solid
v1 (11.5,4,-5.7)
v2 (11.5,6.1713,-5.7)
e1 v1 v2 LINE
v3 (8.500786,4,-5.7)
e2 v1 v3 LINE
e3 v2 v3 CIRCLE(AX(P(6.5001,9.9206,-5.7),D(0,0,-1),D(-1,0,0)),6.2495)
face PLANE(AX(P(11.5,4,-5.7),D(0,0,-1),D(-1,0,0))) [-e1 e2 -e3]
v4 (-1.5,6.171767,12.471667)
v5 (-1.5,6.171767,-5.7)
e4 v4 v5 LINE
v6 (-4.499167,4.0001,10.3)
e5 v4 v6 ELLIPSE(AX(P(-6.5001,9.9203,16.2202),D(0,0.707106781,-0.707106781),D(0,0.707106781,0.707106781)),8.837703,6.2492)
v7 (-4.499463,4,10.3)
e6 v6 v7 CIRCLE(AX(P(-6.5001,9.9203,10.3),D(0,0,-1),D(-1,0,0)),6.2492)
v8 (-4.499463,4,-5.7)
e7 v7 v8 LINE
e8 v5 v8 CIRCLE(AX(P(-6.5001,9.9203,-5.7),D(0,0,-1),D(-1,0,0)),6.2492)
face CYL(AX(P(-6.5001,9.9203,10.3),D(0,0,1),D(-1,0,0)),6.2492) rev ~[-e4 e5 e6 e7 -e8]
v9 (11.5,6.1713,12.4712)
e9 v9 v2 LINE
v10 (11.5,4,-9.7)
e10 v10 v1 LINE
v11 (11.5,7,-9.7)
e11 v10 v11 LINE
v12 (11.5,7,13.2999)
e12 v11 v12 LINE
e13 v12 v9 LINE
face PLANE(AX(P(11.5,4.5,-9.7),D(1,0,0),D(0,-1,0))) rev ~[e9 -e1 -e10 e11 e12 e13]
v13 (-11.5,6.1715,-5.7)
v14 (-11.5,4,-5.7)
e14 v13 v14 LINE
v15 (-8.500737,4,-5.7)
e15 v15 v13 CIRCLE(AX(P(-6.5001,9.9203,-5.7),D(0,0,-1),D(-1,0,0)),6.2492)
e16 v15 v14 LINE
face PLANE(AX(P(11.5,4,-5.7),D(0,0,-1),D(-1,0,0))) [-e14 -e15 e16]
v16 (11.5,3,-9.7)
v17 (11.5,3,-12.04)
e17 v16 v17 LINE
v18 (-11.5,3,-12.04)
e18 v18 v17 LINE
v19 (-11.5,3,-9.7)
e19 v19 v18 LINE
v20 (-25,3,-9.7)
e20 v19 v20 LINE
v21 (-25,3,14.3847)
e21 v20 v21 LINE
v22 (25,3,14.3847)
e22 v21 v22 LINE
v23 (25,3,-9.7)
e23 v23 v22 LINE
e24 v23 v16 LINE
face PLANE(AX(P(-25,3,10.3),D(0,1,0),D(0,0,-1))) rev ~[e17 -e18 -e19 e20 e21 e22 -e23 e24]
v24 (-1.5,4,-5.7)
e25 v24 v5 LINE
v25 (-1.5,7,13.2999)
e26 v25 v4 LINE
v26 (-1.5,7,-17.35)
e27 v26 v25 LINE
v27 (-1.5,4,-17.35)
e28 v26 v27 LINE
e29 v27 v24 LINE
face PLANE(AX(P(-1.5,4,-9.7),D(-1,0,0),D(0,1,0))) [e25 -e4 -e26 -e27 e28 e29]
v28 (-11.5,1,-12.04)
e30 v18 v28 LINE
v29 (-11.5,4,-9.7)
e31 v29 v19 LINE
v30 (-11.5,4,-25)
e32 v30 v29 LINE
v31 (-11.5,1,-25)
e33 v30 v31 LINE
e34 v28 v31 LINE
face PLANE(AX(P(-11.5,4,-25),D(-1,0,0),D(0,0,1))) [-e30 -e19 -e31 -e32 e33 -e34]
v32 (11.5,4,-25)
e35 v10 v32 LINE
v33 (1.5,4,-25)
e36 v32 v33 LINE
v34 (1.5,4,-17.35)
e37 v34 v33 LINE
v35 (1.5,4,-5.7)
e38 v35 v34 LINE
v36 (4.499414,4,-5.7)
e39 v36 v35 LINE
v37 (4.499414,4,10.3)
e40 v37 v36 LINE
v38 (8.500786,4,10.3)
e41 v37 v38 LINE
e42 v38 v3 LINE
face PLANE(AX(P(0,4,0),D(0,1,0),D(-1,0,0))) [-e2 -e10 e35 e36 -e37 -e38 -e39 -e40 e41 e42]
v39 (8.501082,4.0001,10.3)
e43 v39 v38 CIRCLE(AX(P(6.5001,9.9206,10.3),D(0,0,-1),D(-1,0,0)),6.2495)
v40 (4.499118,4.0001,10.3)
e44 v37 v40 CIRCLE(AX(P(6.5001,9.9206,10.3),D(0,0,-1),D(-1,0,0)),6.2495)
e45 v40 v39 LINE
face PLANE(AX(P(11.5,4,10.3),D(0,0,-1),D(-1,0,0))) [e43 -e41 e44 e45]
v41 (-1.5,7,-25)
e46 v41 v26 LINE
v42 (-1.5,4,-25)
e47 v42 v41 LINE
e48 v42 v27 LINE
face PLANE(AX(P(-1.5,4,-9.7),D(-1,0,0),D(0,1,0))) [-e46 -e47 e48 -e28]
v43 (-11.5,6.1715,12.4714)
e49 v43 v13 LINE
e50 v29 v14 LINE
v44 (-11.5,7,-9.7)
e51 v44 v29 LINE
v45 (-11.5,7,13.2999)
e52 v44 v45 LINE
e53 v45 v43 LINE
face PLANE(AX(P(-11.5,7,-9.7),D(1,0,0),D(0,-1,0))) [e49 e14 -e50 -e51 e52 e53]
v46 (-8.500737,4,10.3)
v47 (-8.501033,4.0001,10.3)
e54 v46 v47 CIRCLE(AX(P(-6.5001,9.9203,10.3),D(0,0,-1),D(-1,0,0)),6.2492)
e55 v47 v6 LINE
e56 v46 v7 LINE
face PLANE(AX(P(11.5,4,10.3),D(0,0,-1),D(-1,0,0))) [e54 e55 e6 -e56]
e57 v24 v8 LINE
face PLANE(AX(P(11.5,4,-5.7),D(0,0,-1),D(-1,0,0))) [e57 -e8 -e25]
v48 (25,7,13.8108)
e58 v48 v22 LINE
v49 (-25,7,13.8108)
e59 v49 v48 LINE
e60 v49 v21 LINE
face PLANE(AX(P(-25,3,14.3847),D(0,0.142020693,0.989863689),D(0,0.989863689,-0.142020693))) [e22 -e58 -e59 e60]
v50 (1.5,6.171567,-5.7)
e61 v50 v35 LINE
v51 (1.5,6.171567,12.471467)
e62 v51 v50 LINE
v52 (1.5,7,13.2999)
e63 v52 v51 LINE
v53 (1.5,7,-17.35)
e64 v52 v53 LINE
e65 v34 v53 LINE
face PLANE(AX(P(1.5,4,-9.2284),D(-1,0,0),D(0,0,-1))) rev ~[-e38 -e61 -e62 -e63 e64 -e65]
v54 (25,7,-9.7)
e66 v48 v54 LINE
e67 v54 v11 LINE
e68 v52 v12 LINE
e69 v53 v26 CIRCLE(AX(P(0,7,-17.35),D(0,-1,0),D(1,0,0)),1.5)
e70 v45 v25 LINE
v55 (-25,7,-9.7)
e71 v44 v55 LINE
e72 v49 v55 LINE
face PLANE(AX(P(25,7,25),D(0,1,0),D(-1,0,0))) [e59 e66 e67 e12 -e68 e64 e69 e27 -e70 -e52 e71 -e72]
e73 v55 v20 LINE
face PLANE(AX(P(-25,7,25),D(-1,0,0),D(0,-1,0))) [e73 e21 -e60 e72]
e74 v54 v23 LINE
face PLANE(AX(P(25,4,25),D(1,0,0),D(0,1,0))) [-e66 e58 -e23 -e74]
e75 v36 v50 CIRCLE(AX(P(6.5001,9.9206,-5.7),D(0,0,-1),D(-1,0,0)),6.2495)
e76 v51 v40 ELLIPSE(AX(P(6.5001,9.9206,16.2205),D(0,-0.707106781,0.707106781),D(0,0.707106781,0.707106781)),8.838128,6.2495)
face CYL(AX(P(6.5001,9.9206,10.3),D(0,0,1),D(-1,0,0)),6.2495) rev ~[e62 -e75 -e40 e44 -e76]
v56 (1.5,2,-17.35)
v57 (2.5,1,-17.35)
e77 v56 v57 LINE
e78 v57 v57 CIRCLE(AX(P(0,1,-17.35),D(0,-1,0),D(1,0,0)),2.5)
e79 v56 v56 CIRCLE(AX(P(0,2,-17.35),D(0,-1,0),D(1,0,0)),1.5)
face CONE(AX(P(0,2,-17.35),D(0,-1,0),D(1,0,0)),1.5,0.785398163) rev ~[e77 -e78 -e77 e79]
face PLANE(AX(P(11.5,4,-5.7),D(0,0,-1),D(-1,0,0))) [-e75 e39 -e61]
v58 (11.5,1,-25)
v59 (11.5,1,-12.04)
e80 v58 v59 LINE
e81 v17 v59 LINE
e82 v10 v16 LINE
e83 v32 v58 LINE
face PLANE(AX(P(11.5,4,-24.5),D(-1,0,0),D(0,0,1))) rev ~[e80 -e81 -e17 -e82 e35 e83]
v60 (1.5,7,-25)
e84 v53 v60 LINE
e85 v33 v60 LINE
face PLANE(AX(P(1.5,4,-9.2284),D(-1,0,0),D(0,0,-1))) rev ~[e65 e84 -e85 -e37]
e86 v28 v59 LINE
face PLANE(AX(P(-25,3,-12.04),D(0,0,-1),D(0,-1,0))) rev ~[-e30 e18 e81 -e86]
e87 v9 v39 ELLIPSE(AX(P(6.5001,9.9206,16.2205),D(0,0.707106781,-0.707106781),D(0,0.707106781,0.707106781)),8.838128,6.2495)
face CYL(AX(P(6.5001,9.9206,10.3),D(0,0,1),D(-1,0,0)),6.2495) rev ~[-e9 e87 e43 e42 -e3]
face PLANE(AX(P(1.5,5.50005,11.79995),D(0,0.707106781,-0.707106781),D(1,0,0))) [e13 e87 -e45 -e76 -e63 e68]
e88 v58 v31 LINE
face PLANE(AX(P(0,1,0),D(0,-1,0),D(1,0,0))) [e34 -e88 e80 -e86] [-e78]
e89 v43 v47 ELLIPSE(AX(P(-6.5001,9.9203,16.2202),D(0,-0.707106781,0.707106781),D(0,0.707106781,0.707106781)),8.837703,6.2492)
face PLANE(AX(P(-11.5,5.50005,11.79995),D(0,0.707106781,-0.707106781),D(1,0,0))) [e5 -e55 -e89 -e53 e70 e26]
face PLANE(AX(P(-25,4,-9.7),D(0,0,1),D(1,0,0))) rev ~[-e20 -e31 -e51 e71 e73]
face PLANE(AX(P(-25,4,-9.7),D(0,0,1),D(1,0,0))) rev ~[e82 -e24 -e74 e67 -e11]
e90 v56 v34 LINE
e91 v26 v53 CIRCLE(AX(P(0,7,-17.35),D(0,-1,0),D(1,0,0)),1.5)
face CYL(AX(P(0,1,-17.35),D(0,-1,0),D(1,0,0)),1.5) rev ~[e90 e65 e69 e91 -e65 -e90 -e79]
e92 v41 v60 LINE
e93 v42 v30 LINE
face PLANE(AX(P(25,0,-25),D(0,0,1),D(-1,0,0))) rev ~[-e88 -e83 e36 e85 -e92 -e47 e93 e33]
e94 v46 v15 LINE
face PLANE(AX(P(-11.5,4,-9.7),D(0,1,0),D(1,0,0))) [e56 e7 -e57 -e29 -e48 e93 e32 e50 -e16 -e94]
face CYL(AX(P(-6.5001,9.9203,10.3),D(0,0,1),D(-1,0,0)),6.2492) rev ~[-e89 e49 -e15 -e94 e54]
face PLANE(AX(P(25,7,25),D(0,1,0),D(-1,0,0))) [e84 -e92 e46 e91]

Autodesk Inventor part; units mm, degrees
ref_plane "YZ Plane" through (0, 0, 0) normal (1, 0, 0) x (0, 1, 0)
ref_plane "XZ Plane" through (0, 0, 0) normal (0, 1, 0) x (-1, 0, 0)
ref_plane "XY Plane" through (0, 0, 0) normal (0, 0, 1) x (1, 0, 0)
sketch "Sketch1" plane through (0, 0, 0) normal (0, 1, 0) x (-1, 0, 0)
  line L0 (-25, -25) -> (25, -25)
  line L1 (25, -25) -> (25, 25)
  line L2 (25, 25) -> (-25, 25)
  line L3 (-25, 25) -> (-25, -25)
  point P0 (0, 0)
  dimension "d2" = 50
  dimension "d3" = 50
extrude "Extrusion1" add sketch "Sketch1" along normal blind 4
sketch "Sketch2" plane through (0, 4, 0) normal (0, 1, 0) x (1, 0, 0)
  line L0 (-25, 25) -> (-25, -25) projected
  line L1 (-25, -25) -> (25, -25) projected
  line L2 (25, -25) -> (25, 25) projected
  line L3 (25, 25) -> (-25, 25) projected
  line L4 (-25, -25) -> (25, -25) projected
  line L5 (0, -25) -> (0, 25)
  line L6 (25, 25) -> (-25, 25) projected
  line L7 (0, -25) -> (-1.5, -25)
  line L8 (-1.5, -25) -> (1.5, -25)
  line L9 (1.5, -25) -> (1.5, 25)
  line L10 (1.5, 25) -> (-1.5, 25)
  line L11 (-1.5, 25) -> (-1.5, -25)
  line L12 (1.5, 9.2284) -> (-1.5, 9.2284)
  line L13 (1.5, 9.2284) -> (-1.5, 9.2284)
  line L14 (-1.5, 9.2284) -> (-1.5, 25)
  line L15 (-1.5, 25) -> (1.5, 25)
  line L16 (1.5, 25) -> (1.5, 9.2284)
  point P0 (0, 0)
  point P1 (1.5, 25)
  dimension "d6" = 1.5
  dimension "d7" = 3
extrude "Extrusion2" add sketch "Sketch2" along normal blind 3 contours L3 L5 L12 L11 | L3 L9 L12 L5
sketch "Sketch3" plane through (0, 4, 0) normal (0, 1, 0) x (1, 0, 0)
  line L0 (1.5, 25) -> (1.5, 9.2284) projected
  line L1 (1.5, 9.2284) -> (-1.5, 9.2284) projected
  line L2 (-1.5, 9.2284) -> (-1.5, 25) projected
  line L3 (-1.5, 25) -> (-25, 25) projected
  line L4 (-25, 25) -> (-25, -25) projected
  line L5 (-25, -25) -> (25, -25) projected
  line L6 (25, -25) -> (25, 25) projected
  line L7 (25, 25) -> (1.5, 25) projected
  line L8 (11.5, 24.5) -> (11.5, 9.7) projected
  line L9 (-11.5, 9.7) -> (-11.5, 24.5) projected
  line L10 (25, 25) -> (1.5, 25) projected
  line L11 (25, 25) -> (11.5, 25)
  line L12 (11.5, 25) -> (11.5, 9.7)
  line L13 (11.5, 9.7) -> (25, 9.7)
  line L14 (25, 9.7) -> (25, 25)
  line L15 (-11.5, 9.7) -> (-25, 9.7)
  line L16 (-25, 9.7) -> (-25, 25)
  line L17 (-25, 25) -> (-11.5, 25)
  line L18 (-11.5, 25) -> (-11.5, 9.7)
  point P0 (0, 0)
extrude "Extrusion3" cut sketch "Sketch3" against normal blind 10 contours L7 L6 L13 L8 L12 | L18 L9 L15 L4 L3
sketch "Sketch4" plane through (0, 0, 0) normal (0, -1, 0) x (1, 0, 0)
  line L0 (-11.5, -9.7) -> (-11.5, -25) projected
  line L1 (11.5, -25) -> (-11.5, -25) projected
  line L2 (11.5, -25) -> (11.5, -9.7) projected
  line L3 (11.5, -9.7) -> (25, -9.7) projected
  line L4 (25, 25) -> (25, -9.7) projected
  line L5 (-25, 25) -> (25, 25) projected
  line L6 (-25, -9.7) -> (-25, 25) projected
  line L7 (-25, -9.7) -> (-11.5, -9.7) projected
  point P0 (0, 0)
extrude "Extrusion4" cut sketch "Sketch4" against normal blind 1
sketch "Sketch5" plane through (-25, 4, 25) normal (0, 0, 1) x (1, 0, 0)
  line L0 (0, -3) -> (50, -3) projected
  line L1 (50, -3) -> (50, 0) projected
  line L2 (0, 0) -> (50, 0) projected
  line L3 (0, -3) -> (0, 0) projected
  line L4 (0, 0) -> (50, 0) projected
  line L5 (0, 0) -> (50, 0)
  line L6 (50, 0) -> (50, 3)
  line L7 (50, 3) -> (0, 3)
  line L8 (0, 3) -> (0, 0)
  point P0 (25, -4)
  dimension "d14" = 3
extrude "Extrusion5" add sketch "Sketch5" against normal up to surface (34.7 mm away) contours L8 L7 L6 L2
sketch "Sketch6" plane through (11.5, 4, -9.7) normal (0, 0, -1) x (-1, 0, 0)
  line L0 (-13.5, -3) -> (0, -3) projected
  line L1 (0, 0) -> (0, -3) projected
  line L2 (10, 0) -> (0, 0) projected
  line L3 (10, 3) -> (10, 0) projected
  line L4 (10, 3) -> (-13.5, 3) projected
  line L5 (-13.5, -3) -> (-13.5, 3) projected
  line L6 (23, -3) -> (36.5, -3) projected
  line L7 (36.5, 3) -> (36.5, -3) projected
  line L8 (36.5, 3) -> (13, 3) projected
  line L9 (13, 0) -> (13, 3) projected
  line L10 (23, 0) -> (13, 0) projected
  line L11 (23, 0) -> (23, -3) projected
  line L12 (0, 0.5) -> (0, 11.5) projected
  line L13 (23, 11.5) -> (23, 0.5) projected
  line L14 (10, 0) -> (0, 0) projected
  line L15 (0, 11.5) -> (0, 0)
  line L16 (23, 11.5) -> (23, 0)
  line L17 (0, 0) -> (0, -3) projected
  line L18 (10, 3) -> (-13.5, 3) projected
  line L19 (0, 0) -> (10, 0)
  line L20 (10, 0) -> (10, 3)
  line L21 (10, 3) -> (0, 3)
  line L22 (0, 3) -> (0, 0)
  line L23 (13, 0) -> (13, 3) projected
  line L24 (23, 0) -> (23, -3) projected
  line L25 (13, 3) -> (23, 3)
  line L26 (23, 3) -> (23, 0)
  line L27 (23, 0) -> (13, 0)
  line L28 (13, 0) -> (13, 3)
  point P0 (11.5, -4)
  point P1 (23, 0.5)
  point P2 (0, 3)
extrude "Extrusion6" cut sketch "Sketch6" against normal blind 20 contours L15 L12 L4 L3 L2 | L10 L9 L8 L13 L16
sketch "Sketch7" plane through (11.5, 4, 10.3) normal (0, 0, -1) x (-1, 0, 0)
  arc A0 (0, 2.75) -> (10, 2.7503) centre (4.9999, 5.9206) ccw projected
  arc A1 (13, 2.75) -> (23, 2.7497) centre (18.0001, 5.9203) ccw projected
  line L0 (0, 0) -> (10, 0) projected
  line L1 (5, 0) -> (5, -0.3289)
  line L2 (5, -0.3289) -> (19.1354, -0.3289)
  circle A2 centre (4.9999, 5.9206) radius 6.2495
  circle A3 centre (18.0001, 5.9203) radius 6.2492
  line L3 (0, 3) -> (-13.5, 3) projected
  line L4 (0, 3) -> (10, 3)
  line L5 (10, 3) -> (10, 0)
  line L6 (10, 0) -> (0, 0)
  line L7 (0, 0) -> (0, 3)
  line L8 (13, 0) -> (13, 3) projected
  line L9 (23, 3) -> (23, 0) projected
  line L10 (13, 0) -> (23, 0)
  line L11 (23, 0) -> (23, 3)
  line L12 (23, 3) -> (13, 3)
  line L13 (13, 3) -> (13, 0)
  point P0 (11.5, -4)
  point P1 (20.0008, 0)
  point P2 (23, 2.1715)
  point P3 (15.9994, 0)
  point P4 (13, 2.1717)
  point P5 (10, 2.1715)
  point P6 (7.0007, 0)
  point P7 (0, 2.1713)
  point P8 (2.9992, 0)
extrude "Extrusion7" add sketch "Sketch7" along normal blind 16 contours A2 L0 L7 | A2 L5 L0 | A3 L10 L8 | A3 L9 L10
chamfer "Chamfer1" distance 3 angle 45 2 edges at (6.5, 7, 10.3) (-6.5, 7, 10.3)
sketch "Sketch8" plane through (-25, 7, -9.7) normal (-1, 0, 0) x (0, 0, 1)
  circle A0 centre (-11.34, 3) radius 8 projected
  line L0 (0, -6) -> (34.7, -6) projected
  line L1 (34.7, -6) -> (34.7, 0) projected
  line L2 (34.7, 0) -> (0, 0) projected
  line L3 (0, 0) -> (0, -6) projected
  line L4 (-11.34, 3) -> (-19.34, 3)
  line L5 (-19.34, 3) -> (-22.34, 3)
  line L6 (-22.34, 3) -> (27.66, 3)
  line L7 (0, -6) -> (34.7, -6) projected
  line L8 (34.7, -6) -> (27.66, -6)
  line L9 (27.66, -6) -> (27.66, 9.5427)
  line L10 (27.66, 9.5427) -> (34.7, 9.5427)
  line L11 (34.7, 9.5427) -> (34.7, -6)
  point P0 (9.7, -7)
  point P1 (27.66, 0)
  dimension "d24" = 3
  dimension "d25" = 50
extrude "Extrusion8" cut sketch "Sketch8" against normal through all contours L9 L2 L1 L0
sketch "Sketch9" plane through (25, 1, -9.7) normal (1, 0, 0) x (0, 0, -1)
  line L0 (-27.66, 6) -> (-27.66, 0) projected
  line L1 (-27.66, 0) -> (0, 0) projected
  line L2 (0, 0) -> (0, 6) projected
  line L3 (-27.66, 6) -> (0, 6) projected
  line L4 (-27.66, 0.31) -> (-25.7682, 0.01) projected
  line L5 (-25.7682, 0.01) -> (-14.0234, 0.01) projected
  line L6 (-14.0234, 0.01) -> (-14.0234, 0.61) projected
  line L7 (-25.7682, 0.61) -> (-14.0234, 0.61) projected
  line L8 (-25.7682, 0.61) -> (-27.66, 0.31) projected
  line L9 (-27.66, 0) -> (-27.66, 6) projected
  line L10 (-14.0234, 0.61) -> (-27.66, 0.61)
  line L11 (-27.66, 0.61) -> (-27.66, 1.22)
  line L12 (-27.66, 1.22) -> (-14.0234, 1.22)
  line L13 (-14.0234, 1.22) -> (-14.0234, 0.61)
  point P0 (-9.7, -1)
  point P1 (-27.66, 1.22)
  dimension "d28" = 0.61
extrude "Extrusion9" cut sketch "Sketch9" against normal through all contours L12 L13 L7 L10 L0
sketch "Sketch10" plane through (25, 1, -9.7) normal (1, 0, 0) x (0, 0, -1)
  line L0 (-27.66, 0.31) -> (-25.7682, 0.01) projected
  line L1 (-25.7682, 0.01) -> (-14.0234, 0.01) projected
  line L2 (-14.0234, 0.01) -> (-14.0234, 0.61) projected
  line L3 (-25.7682, 0.61) -> (-14.0234, 0.61) projected
  line L4 (-25.7682, 0.61) -> (-27.66, 0.31) projected
  line L5 (-14.0234, 1.22) -> (-14.0234, 0.61) projected
  line L6 (-27.66, 0) -> (0, 0) projected
  line L7 (0, 0) -> (0, 6) projected
  line L8 (-27.66, 6) -> (0, 6) projected
  line L9 (-27.66, 6) -> (-27.66, 1.22) projected
  line L10 (-27.66, 1.22) -> (-14.0234, 1.22) projected
  line L11 (-25.7682, 0.61) -> (-25.7682, 6)
  line L12 (-27.66, 6) -> (0, 6) projected
  line L13 (-19.9, 5.7) -> (-19.9, 6.1)
  line L14 (15.3, 6) -> (-23, 6) projected
  line L15 (-19.9, 6) -> (-20.9, 6)
  line L16 (-20.9, 6) -> (-23.9, 6)
  line L17 (-25.7682, 0.61) -> (-23.9, 6)
  line L18 (-14.0234, 0.61) -> (-27.66, 0.61) projected
  line L19 (-27.66, 0.61) -> (-27.66, 0) projected
  point P0 (-9.7, -1)
  point P1 (-25.5568, 1.22)
  dimension "d31" = 1
  dimension "d32" = 3
extrude "Extrusion10" cut sketch "Sketch10" against normal through all contours L11 L8 L17 L10 | L10 L9 L8 L11
sketch "Sketch11" plane through (0, 1, 0) normal (0, -1, 0) x (1, 0, 0)
  circle A0 centre (0, -17.35) radius 1.5 projected
  line L0 (3.695, -17.35) -> (1.8475, -14.15) projected
  line L1 (1.8475, -20.55) -> (3.695, -17.35) projected
  line L2 (-1.8475, -20.55) -> (1.8475, -20.55) projected
  line L3 (-3.695, -17.35) -> (-1.8475, -20.55) projected
  line L4 (-1.8475, -14.15) -> (-3.695, -17.35) projected
  line L5 (1.8475, -14.15) -> (-1.8475, -14.15) projected
  circle A1 centre (0, -17.35) radius 1.5 projected
  line L6 (-25, -10.04) -> (-25, -32.04) projected
  point P0 (0, 0)
extrude "Extrusion11" cut sketch "Sketch11" against normal through all contours A0
chamfer "Chamfer2" distance 1 angle 45 1 edges at (-1.5, 1, -17.35)
sketch "Sketch12" plane through (-25, 1, -9.7) normal (-1, 0, 0) x (0, 0, 1)
  line L0 (25.5568, 1.22) -> (23.9, 6) projected
  line L1 (23.9, 6) -> (0, 6) projected
  line L2 (0, 6) -> (0, 0) projected
  line L3 (0, 0) -> (27.66, 0) projected
  line L4 (27.66, 0) -> (27.66, 0.61) projected
  line L5 (27.66, 0.61) -> (14.0234, 0.61) projected
  line L6 (14.0234, 0.61) -> (14.0234, 1.22) projected
  line L7 (14.0234, 1.22) -> (25.5568, 1.22) projected
  circle A0 centre (-11.34, 9) radius 11 projected
  line L8 (-22.34, 9) -> (27.66, 9)
  line L9 (27.66, 9) -> (27.66, -12.93)
  line L10 (-11.34, 9) -> (-11.34, -2)
  line L11 (-11.34, -2) -> (27.66, -1.965)
  line L12 (14.0234, 1.22) -> (25.5568, 1.22) projected
  line L13 (27.66, -1.3745) -> (14.0234, 1.22)
  line L14 (14.0234, 1.22) -> (14.0795, 1.5147)
  line L15 (14.0234, 1.22) -> (13.9673, 0.9253)
  line L16 (14.0795, 1.5147) -> (28.9229, -1.3094)
  line L17 (13.9673, 0.9253) -> (29.035, -1.9638)
  line L18 (25.5568, 1.22) -> (24.566, 4.0785)
  line L19 (25.5568, 1.22) -> (23.9, 6) projected
  line L20 (25.5568, 1.22) -> (26.2577, -0.8023)
  point P0 (9.7, -1)
  point P1 (15.6117, 0.61)
  point P2 (14.0234, 0.9145)
  point P3 (15.6285, 1.22)
  dimension "d40" = 0.3
  dimension "d41" = 0.3
extrude "Extrusion12" add sketch "Sketch12" against normal blind 50 contours L20 L5 L16 L7 | L20 L3 L16 L5 | L20 L16 L3 | L17 L5 L6
sketch "Sketch13" plane through (-25, 1, -9.7) normal (-1, 0, 0) x (0, 0, 1)
  line L0 (18.8347, 0.61) -> (15.6117, 0.61) projected
  line L1 (15.6117, 0.61) -> (14.0234, 0.9145) projected
  line L2 (14.0234, 0.9145) -> (14.0234, 1.22) projected
  line L3 (14.0234, 1.22) -> (15.6285, 1.22) projected
  line L4 (15.6285, 1.22) -> (18.8347, 0.61) projected
  line L5 (25.7682, 0.61) -> (23.9, 6) projected
  line L6 (23.9, 6) -> (0, 6) projected
  line L7 (0, 6) -> (0, 0) projected
  line L8 (0, 0) -> (22.0408, 0) projected
  line L9 (22.0408, 0) -> (26.2577, -0.8023) projected
  line L10 (26.2577, -0.8023) -> (25.9796, 0) projected
  line L11 (25.9796, 0) -> (27.66, 0) projected
  line L12 (27.66, 0) -> (27.66, 0.61) projected
  line L13 (27.66, 0.61) -> (25.7682, 0.61) projected
  line L14 (14.0234, 0.9145) -> (14.0234, 1.22) projected
  line L15 (14.0234, 0.9145) -> (26.7141, -1.5188)
  line L16 (14.0234, 1.22) -> (15.6285, 1.22) projected
  line L17 (15.6285, 1.22) -> (29.31, -1.383)
  line L18 (14.0234, 0.9145) -> (13.2268, 1.0673)
  line L19 (13.2268, 1.0673) -> (13.3704, 1.8159)
  line L20 (15.6285, 1.22) -> (13.3396, 1.6555)
  line L21 (25.9796, 0) -> (27.66, 0) projected
  line L22 (25.9796, 0) -> (25.7682, 0.61)
  line L23 (26.7141, -1.5188) -> (27.0047, -0.9444)
  point P0 (9.7, -1)
  point P1 (18.7931, 0)
extrude "Extrusion13" cut sketch "Sketch13" against normal through all contours L17 L8 L15 L0 | L3 L2 L18 L19 L20 | L22 L13 L12 L11
sketch "Sketch14" plane through (-25, 1, -9.7) normal (-1, 0, 0) x (0, 0, 1)
  line L0 (26.2577, -0.8023) -> (23.9, 6) projected
  line L1 (23.9, 6) -> (0, 6) projected
  line L2 (0, 6) -> (0, 0) projected
  line L3 (0, 0) -> (18.7931, 0) projected
  line L4 (18.7931, 0) -> (13.2268, 1.0673) projected
  line L5 (13.2268, 1.0673) -> (13.3396, 1.6555) projected
  line L6 (13.3396, 1.6555) -> (26.2577, -0.8023) projected
  circle A0 centre (-11.34, 9) radius 11 projected
  line L7 (-22.34, 9) -> (27.66, 9)
  line L8 (-11.34, 9) -> (-11.34, -2)
  line L9 (-11.34, 9) -> (27.66, 9)
  line L10 (27.66, 9) -> (27.66, -2)
  line L11 (27.66, -2) -> (-11.34, -2)
  line L12 (-11.34, -2) -> (-11.34, 9)
  line L13 (4, 3) -> (-7.65, 3) projected
  line L14 (-7.65, 3) -> (-15.3, 3) projected
  line L15 (-15.3, 3) -> (0, 3) projected
  line L16 (0, 3) -> (4, 3) projected
  line L17 (4, 3) -> (20, 3) projected
  line L18 (20, 3) -> (4, 3) projected
  line L19 (0, 3) -> (-15.3, 3) projected
  line L20 (0, 3) -> (20, 3)
  line L21 (20, 3) -> (20, 2)
  line L22 (20, 2) -> (0, 2)
  line L23 (0, 2) -> (0, 3)
  line L24 (22.1715, 5.1715) -> (20, 3) projected
  line L25 (20, 3) -> (29.0462, 3)
  line L26 (29.0462, 3) -> (29.0462, 2)
  line L27 (29.0462, 2) -> (20, 2)
  line L28 (20, 2) -> (20, 3)
  line L29 (27.66, 2) -> (-2.34, 2)
  line L30 (-2.34, 2) -> (-2.34, -1)
  line L31 (-2.34, -1) -> (27.66, -1)
  line L32 (27.66, -1) -> (27.66, 2)
  line L33 (27.66, -1) -> (24.0847, 2)
  line L34 (26.2577, -0.8023) -> (23.9, 6) projected
  line L35 (24.0847, 2) -> (23.5108, 6)
  line L36 (23.9, 6) -> (0, 6) projected
  point P0 (9.7, -1)
  point P1 (24.0847, 2)
  point P2 (25.7792, 0.5781)
  dimension "d46" = 50
  dimension "d47" = 1
  dimension "d48" = 30
  dimension "d49" = 3
  dimension "d50" = 40
extrude "Extrusion14" cut sketch "Sketch14" against normal through all contours L6 L5 L4 L3 L2 L22 L27 L33 L0 | L0 L33 L31 L30 L29 L2 L3 L4 L5 L6 | L33 L27 L0 | L27 L35 L25 L0 | L25 L35 L1 L0
properties part number "podsta"
